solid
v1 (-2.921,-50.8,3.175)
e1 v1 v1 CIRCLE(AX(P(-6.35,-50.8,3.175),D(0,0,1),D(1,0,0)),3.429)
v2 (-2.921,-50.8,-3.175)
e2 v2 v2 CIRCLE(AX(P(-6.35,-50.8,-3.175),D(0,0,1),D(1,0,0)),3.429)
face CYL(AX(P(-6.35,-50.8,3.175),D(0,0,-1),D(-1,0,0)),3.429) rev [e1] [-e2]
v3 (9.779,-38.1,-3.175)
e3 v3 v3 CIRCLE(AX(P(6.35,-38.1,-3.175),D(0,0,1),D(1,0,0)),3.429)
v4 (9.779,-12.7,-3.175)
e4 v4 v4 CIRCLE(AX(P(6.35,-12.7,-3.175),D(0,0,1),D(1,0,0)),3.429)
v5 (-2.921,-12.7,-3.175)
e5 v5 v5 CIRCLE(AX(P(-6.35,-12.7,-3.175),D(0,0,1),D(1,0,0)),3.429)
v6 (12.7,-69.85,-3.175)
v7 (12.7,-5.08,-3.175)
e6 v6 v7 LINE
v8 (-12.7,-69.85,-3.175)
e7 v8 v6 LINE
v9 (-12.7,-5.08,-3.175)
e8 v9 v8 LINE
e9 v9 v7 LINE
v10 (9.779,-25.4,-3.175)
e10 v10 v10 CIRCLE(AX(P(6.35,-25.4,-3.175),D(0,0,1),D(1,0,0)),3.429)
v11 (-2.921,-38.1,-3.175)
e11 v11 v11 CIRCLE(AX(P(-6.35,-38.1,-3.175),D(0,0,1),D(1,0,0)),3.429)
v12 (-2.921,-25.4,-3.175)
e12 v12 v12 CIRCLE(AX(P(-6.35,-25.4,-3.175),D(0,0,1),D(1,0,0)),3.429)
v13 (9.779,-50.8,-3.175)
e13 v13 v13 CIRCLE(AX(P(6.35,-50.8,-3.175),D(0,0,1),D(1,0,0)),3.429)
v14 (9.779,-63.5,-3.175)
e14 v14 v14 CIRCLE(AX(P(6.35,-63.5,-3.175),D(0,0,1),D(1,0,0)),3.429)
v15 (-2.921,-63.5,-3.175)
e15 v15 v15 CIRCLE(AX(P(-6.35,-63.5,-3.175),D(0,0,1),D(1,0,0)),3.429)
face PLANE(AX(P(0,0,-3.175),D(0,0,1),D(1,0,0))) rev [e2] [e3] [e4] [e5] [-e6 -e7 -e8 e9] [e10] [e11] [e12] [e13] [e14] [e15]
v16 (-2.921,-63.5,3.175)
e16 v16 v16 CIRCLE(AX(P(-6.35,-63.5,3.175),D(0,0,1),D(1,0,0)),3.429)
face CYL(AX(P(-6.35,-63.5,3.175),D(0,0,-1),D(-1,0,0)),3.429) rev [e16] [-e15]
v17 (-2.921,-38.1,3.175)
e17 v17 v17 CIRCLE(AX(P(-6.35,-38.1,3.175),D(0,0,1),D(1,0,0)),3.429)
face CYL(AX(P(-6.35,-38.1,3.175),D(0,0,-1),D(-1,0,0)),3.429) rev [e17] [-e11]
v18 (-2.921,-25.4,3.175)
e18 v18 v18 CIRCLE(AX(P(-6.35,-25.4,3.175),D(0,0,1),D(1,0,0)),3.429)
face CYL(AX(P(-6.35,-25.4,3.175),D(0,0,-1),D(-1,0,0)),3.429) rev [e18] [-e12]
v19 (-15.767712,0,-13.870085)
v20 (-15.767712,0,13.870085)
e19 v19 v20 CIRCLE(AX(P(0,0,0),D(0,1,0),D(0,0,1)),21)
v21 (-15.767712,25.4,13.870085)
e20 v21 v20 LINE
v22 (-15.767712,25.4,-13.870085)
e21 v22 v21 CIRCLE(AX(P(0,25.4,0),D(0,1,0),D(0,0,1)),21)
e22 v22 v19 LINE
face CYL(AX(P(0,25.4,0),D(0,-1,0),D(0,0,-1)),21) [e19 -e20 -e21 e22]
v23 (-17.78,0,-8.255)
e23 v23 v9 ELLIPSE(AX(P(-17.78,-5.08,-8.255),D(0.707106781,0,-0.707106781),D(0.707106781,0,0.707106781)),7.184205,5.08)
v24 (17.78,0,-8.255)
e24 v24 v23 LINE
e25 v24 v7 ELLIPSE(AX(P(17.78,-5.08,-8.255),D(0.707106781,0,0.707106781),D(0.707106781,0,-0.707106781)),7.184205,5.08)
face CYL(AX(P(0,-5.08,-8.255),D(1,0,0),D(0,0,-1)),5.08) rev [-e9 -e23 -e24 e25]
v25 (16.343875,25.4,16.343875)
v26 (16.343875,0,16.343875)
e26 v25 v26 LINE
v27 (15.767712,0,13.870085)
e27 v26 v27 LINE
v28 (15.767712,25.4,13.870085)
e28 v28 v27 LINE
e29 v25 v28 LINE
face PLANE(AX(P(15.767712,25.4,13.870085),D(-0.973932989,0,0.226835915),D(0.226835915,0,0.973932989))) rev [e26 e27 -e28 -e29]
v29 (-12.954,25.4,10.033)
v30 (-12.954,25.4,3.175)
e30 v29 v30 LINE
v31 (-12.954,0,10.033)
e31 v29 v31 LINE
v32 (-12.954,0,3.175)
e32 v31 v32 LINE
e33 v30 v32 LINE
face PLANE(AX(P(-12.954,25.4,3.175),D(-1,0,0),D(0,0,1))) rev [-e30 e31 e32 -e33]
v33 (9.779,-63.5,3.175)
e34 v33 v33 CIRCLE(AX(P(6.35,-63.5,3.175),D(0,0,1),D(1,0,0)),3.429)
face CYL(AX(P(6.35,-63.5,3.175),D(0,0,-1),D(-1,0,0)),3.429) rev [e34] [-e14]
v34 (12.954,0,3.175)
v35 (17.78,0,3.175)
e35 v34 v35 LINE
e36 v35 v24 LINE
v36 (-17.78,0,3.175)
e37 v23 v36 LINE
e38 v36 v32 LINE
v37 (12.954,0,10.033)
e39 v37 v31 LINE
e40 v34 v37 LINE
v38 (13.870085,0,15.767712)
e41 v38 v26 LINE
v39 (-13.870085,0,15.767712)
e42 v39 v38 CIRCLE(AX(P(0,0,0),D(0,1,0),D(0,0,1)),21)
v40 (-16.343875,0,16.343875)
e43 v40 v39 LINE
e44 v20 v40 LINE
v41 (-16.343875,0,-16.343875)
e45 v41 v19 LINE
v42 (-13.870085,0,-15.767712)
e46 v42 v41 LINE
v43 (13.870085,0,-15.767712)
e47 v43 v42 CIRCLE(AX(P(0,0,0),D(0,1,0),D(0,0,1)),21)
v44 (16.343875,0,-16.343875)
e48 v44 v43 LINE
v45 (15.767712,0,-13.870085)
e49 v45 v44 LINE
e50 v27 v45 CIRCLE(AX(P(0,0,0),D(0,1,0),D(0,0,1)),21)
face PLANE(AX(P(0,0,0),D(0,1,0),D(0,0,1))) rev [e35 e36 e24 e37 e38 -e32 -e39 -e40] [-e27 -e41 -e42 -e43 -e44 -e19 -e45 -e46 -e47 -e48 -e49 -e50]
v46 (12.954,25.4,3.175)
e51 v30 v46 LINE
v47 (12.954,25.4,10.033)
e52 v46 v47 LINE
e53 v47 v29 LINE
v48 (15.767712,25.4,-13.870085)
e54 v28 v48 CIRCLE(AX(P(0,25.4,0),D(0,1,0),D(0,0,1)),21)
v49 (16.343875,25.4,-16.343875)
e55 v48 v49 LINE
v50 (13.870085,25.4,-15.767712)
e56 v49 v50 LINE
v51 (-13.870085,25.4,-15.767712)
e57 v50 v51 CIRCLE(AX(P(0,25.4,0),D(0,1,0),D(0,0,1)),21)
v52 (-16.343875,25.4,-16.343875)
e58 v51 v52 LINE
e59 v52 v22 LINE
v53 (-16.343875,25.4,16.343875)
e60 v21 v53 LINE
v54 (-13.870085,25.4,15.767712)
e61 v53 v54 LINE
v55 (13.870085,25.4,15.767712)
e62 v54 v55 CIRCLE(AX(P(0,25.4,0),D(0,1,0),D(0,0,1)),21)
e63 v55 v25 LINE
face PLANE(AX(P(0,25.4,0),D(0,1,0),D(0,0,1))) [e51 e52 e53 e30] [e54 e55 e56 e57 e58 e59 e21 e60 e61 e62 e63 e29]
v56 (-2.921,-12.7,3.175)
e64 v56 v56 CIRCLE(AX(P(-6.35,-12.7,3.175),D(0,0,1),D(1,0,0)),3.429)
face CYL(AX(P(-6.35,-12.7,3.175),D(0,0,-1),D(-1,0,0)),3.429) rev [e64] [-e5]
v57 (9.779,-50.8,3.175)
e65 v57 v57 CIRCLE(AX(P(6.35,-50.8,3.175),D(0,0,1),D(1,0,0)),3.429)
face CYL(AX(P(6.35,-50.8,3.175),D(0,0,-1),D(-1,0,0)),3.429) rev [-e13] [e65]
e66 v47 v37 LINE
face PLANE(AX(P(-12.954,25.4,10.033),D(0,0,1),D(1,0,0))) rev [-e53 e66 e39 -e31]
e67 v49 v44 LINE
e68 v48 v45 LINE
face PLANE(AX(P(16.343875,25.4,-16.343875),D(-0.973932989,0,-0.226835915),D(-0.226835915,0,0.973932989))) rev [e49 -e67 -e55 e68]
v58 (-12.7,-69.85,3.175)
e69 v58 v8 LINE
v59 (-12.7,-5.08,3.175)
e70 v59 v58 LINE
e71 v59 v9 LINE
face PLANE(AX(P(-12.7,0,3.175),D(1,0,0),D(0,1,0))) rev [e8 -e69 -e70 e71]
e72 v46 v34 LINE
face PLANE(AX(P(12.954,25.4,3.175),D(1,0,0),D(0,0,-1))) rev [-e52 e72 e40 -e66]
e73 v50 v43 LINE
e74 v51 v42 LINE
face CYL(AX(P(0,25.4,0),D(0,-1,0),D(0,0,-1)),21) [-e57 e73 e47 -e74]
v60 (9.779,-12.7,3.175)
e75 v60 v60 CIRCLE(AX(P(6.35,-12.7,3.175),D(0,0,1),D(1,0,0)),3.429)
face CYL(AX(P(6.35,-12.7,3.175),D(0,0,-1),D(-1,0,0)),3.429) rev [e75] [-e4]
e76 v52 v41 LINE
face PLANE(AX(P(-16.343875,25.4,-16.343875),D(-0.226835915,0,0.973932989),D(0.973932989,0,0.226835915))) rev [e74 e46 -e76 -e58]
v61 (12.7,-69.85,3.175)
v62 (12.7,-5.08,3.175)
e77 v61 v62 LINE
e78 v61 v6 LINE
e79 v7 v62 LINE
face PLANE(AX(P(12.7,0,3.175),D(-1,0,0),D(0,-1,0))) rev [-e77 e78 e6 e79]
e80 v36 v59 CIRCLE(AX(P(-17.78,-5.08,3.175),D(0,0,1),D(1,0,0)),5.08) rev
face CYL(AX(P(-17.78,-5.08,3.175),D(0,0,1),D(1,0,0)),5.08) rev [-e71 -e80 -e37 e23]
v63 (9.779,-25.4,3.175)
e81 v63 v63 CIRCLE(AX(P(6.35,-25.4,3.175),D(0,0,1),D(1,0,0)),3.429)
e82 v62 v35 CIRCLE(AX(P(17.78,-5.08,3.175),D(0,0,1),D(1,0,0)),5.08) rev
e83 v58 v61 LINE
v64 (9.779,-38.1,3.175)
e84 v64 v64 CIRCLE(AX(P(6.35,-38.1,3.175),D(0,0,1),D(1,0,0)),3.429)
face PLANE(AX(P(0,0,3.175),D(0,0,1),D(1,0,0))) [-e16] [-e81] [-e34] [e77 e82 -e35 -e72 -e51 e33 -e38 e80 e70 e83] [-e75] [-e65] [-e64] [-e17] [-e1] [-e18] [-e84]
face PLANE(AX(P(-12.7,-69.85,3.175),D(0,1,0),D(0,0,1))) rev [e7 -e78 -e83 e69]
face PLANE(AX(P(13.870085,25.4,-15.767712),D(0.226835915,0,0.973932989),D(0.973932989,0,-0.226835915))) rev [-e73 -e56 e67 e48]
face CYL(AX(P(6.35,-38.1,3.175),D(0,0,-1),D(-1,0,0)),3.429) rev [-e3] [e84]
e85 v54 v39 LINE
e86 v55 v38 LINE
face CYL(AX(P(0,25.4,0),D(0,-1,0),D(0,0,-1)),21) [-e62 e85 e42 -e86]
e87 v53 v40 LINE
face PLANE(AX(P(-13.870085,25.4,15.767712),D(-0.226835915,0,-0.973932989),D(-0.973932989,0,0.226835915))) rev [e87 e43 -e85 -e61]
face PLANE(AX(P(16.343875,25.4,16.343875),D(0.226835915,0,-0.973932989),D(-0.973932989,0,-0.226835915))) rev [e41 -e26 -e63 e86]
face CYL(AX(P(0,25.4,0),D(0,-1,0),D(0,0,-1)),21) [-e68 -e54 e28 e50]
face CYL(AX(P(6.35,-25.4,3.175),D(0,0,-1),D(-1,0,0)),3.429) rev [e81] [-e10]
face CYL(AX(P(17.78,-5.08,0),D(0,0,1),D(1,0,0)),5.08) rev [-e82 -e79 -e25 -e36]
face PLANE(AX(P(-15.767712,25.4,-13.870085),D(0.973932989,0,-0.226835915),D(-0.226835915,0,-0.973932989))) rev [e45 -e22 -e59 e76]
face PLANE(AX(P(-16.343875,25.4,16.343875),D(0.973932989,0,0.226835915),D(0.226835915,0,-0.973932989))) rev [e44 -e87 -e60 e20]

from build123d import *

# Parameters (mm, degrees)
BOSS_EXTRUDE1_DEPTH = 25.4
SKETCH3_W           = 25.4
SKETCH3_H           = 69.85
SKETCH3_R           = 3.429
BOSS_EXTRUDE3_DEPTH = 3.175
SKETCH4_W           = 25.908
SKETCH4_H           = 6.858
CUT_EXTRUDE1_DEPTH  = 76.901399855
FILLET2_R           = 5.08


with BuildPart() as part:
    # Sketch1 → Boss-Extrude1 (new body)
    with BuildSketch(Plane(origin=(0, 0, 0), x_dir=(1, 0, 0), z_dir=(0, 1, 0))):
        with BuildLine():
            Line((13.870085237, 15.767711804), (16.343875029, 16.343875029))
            Line((16.343875029, 16.343875029), (15.767711804, 13.870085237))
            ThreePointArc((15.767711804, 13.870085237), (21, 0), (15.767711804, -13.870085237))
            Line((15.767711804, -13.870085237), (16.343875029, -16.343875029))
            Line((16.343875029, -16.343875029), (13.870085237, -15.767711804))
            ThreePointArc((13.870085237, -15.767711804), (0, -21), (-13.870085237, -15.767711804))
            Line((-13.870085237, -15.767711804), (-16.343875029, -16.343875029))
            Line((-16.343875029, -16.343875029), (-15.767711804, -13.870085237))
            ThreePointArc((-15.767711804, -13.870085237), (-21, 0), (-15.767711804, 13.870085237))
            Line((-15.767711804, 13.870085237), (-16.343875029, 16.343875029))
            Line((-16.343875029, 16.343875029), (-13.870085237, 15.767711804))
            ThreePointArc((-13.870085237, 15.767711804), (0, 21), (13.870085237, 15.767711804))
        make_face()
    extrude(amount=BOSS_EXTRUDE1_DEPTH)

    # Sketch3 → Boss-Extrude3 (add, symmetric)
    with BuildSketch(Plane.XY):
        with Locations((0, -34.925)):
            Rectangle(SKETCH3_W, SKETCH3_H)
        with Locations((-6.35, -12.7)):
            Circle(SKETCH3_R, mode=Mode.SUBTRACT)
        with Locations((6.35, -12.7)):
            Circle(SKETCH3_R, mode=Mode.SUBTRACT)
        with Locations((6.35, -25.4)):
            Circle(SKETCH3_R, mode=Mode.SUBTRACT)
        with Locations((6.35, -38.1)):
            Circle(SKETCH3_R, mode=Mode.SUBTRACT)
        with Locations((6.35, -50.8)):
            Circle(SKETCH3_R, mode=Mode.SUBTRACT)
        with Locations((6.35, -63.5)):
            Circle(SKETCH3_R, mode=Mode.SUBTRACT)
        with Locations((-6.35, -25.4)):
            Circle(SKETCH3_R, mode=Mode.SUBTRACT)
        with Locations((-6.35, -38.1)):
            Circle(SKETCH3_R, mode=Mode.SUBTRACT)
        with Locations((-6.35, -50.8)):
            Circle(SKETCH3_R, mode=Mode.SUBTRACT)
        with Locations((-6.35, -63.5)):
            Circle(SKETCH3_R, mode=Mode.SUBTRACT)
    extrude(amount=BOSS_EXTRUDE3_DEPTH, both=True)

    # Sketch4 → Cut-Extrude1 (cut, through all)
    with BuildSketch(Plane(origin=(0, 0, 0), x_dir=(-1, 0, 0), z_dir=(0, -1, 0))):
        with Locations((0, -6.604)):
            Rectangle(SKETCH4_W, SKETCH4_H)
    extrude(amount=-CUT_EXTRUDE1_DEPTH, mode=Mode.SUBTRACT)

    # Fillet2
    # the kernel refuses this fillet: 5.08 mm, written as the material it adds along each edge
    with BuildSketch(Plane(origin=(-12.7, 0, -3.175), x_dir=(-1, 0, 0), z_dir=(0, 0, 1)), Plane(origin=(12.7, 0, 3.175), x_dir=(1, 0, 0), z_dir=(0, 0, -1))) as fillet2_piece_1:
        with BuildLine():
            CenterArc((FILLET2_R, FILLET2_R), FILLET2_R, 180, 90)
            Line((0, FILLET2_R), (-FILLET2_R * 0.02, FILLET2_R))
            Line((-FILLET2_R * 0.02, FILLET2_R), (-FILLET2_R * 0.02, -FILLET2_R * 0.02))
            Line((-FILLET2_R * 0.02, -FILLET2_R * 0.02), (FILLET2_R, -FILLET2_R * 0.02))
            Line((FILLET2_R, -FILLET2_R * 0.02), (FILLET2_R, 0))
        make_face()
    extrude(amount=6.35)
    with BuildSketch(Plane(origin=(-12.7, 0, -3.175), x_dir=(0, 0, -1), z_dir=(1, 0, 0))) as fillet2_piece_2:
        with BuildLine():
            CenterArc((FILLET2_R, -FILLET2_R), FILLET2_R, 90, 90)
            Line((0, -FILLET2_R), (-FILLET2_R * 0.02, -FILLET2_R))
            Line((-FILLET2_R * 0.02, -FILLET2_R), (-FILLET2_R * 0.02, FILLET2_R * 0.02))
            Line((-FILLET2_R * 0.02, FILLET2_R * 0.02), (FILLET2_R, FILLET2_R * 0.02))
            Line((FILLET2_R, FILLET2_R * 0.02), (FILLET2_R, 0))
        make_face()
    extrude(amount=25.4)
    with BuildSketch(Plane(origin=(-25.4, 0, -3.175), x_dir=(0, 0, -1), z_dir=(1, 0, 0))) as fillet2_piece_3a_section:
        with BuildLine():
            CenterArc((FILLET2_R, -FILLET2_R), FILLET2_R, 90, 90)
            Line((0, -FILLET2_R), (-FILLET2_R * 0.02, -FILLET2_R))
            Line((-FILLET2_R * 0.02, -FILLET2_R), (-FILLET2_R * 0.02, FILLET2_R * 0.02))
            Line((-FILLET2_R * 0.02, FILLET2_R * 0.02), (FILLET2_R, FILLET2_R * 0.02))
            Line((FILLET2_R, FILLET2_R * 0.02), (FILLET2_R, 0))
        make_face()
    fillet2_piece_3a = extrude(amount=38.1, mode=Mode.PRIVATE)
    fillet2_piece_3a = split(fillet2_piece_3a, bisect_by=Plane(origin=(-12.7, -1.15008718, -4.32508718), z_dir=(-1, 0, 0)), keep=Keep.TOP, mode=Mode.PRIVATE)
    with BuildSketch(Plane(origin=(-12.7, 0, -15.875), x_dir=(-1, 0, 0), z_dir=(0, 0, 1))) as fillet2_piece_3b_section:
        with BuildLine():
            CenterArc((FILLET2_R, FILLET2_R), FILLET2_R, 180, 90)
            Line((0, FILLET2_R), (-FILLET2_R * 0.02, FILLET2_R))
            Line((-FILLET2_R * 0.02, FILLET2_R), (-FILLET2_R * 0.02, -FILLET2_R * 0.02))
            Line((-FILLET2_R * 0.02, -FILLET2_R * 0.02), (FILLET2_R, -FILLET2_R * 0.02))
            Line((FILLET2_R, -FILLET2_R * 0.02), (FILLET2_R, 0))
        make_face()
    fillet2_piece_3b = extrude(amount=19.05, mode=Mode.PRIVATE)
    fillet2_piece_3b = split(fillet2_piece_3b, bisect_by=Plane(origin=(-13.85008718, -1.15008718, -3.175), z_dir=(0, 0, -1)), keep=Keep.TOP, mode=Mode.PRIVATE)
    fillet2_piece_3 = fillet2_piece_3a & fillet2_piece_3b
    add(fillet2_piece_3)
    with BuildSketch(Plane(origin=(-12.7, 0, -3.175), x_dir=(0, 0, -1), z_dir=(1, 0, 0))) as fillet2_piece_4a_section:
        with BuildLine():
            CenterArc((FILLET2_R, -FILLET2_R), FILLET2_R, 90, 90)
            Line((0, -FILLET2_R), (-FILLET2_R * 0.02, -FILLET2_R))
            Line((-FILLET2_R * 0.02, -FILLET2_R), (-FILLET2_R * 0.02, FILLET2_R * 0.02))
            Line((-FILLET2_R * 0.02, FILLET2_R * 0.02), (FILLET2_R, FILLET2_R * 0.02))
            Line((FILLET2_R, FILLET2_R * 0.02), (FILLET2_R, 0))
        make_face()
    fillet2_piece_4a = extrude(amount=38.1, mode=Mode.PRIVATE)
    fillet2_piece_4a = split(fillet2_piece_4a, bisect_by=Plane(origin=(12.7, -1.15008718, -4.32508718), z_dir=(1, 0, 0)), keep=Keep.TOP, mode=Mode.PRIVATE)
    with BuildSketch(Plane(origin=(12.7, 0, 3.175), x_dir=(1, 0, 0), z_dir=(0, 0, -1))) as fillet2_piece_4b_section:
        with BuildLine():
            CenterArc((FILLET2_R, FILLET2_R), FILLET2_R, 180, 90)
            Line((0, FILLET2_R), (-FILLET2_R * 0.02, FILLET2_R))
            Line((-FILLET2_R * 0.02, FILLET2_R), (-FILLET2_R * 0.02, -FILLET2_R * 0.02))
            Line((-FILLET2_R * 0.02, -FILLET2_R * 0.02), (FILLET2_R, -FILLET2_R * 0.02))
            Line((FILLET2_R, -FILLET2_R * 0.02), (FILLET2_R, 0))
        make_face()
    fillet2_piece_4b = extrude(amount=19.05, mode=Mode.PRIVATE)
    fillet2_piece_4b = split(fillet2_piece_4b, bisect_by=Plane(origin=(13.85008718, -1.15008718, -3.175), z_dir=(0, 0, -1)), keep=Keep.TOP, mode=Mode.PRIVATE)
    fillet2_piece_4 = fillet2_piece_4a & fillet2_piece_4b
    add(fillet2_piece_4)


solid = part.part
